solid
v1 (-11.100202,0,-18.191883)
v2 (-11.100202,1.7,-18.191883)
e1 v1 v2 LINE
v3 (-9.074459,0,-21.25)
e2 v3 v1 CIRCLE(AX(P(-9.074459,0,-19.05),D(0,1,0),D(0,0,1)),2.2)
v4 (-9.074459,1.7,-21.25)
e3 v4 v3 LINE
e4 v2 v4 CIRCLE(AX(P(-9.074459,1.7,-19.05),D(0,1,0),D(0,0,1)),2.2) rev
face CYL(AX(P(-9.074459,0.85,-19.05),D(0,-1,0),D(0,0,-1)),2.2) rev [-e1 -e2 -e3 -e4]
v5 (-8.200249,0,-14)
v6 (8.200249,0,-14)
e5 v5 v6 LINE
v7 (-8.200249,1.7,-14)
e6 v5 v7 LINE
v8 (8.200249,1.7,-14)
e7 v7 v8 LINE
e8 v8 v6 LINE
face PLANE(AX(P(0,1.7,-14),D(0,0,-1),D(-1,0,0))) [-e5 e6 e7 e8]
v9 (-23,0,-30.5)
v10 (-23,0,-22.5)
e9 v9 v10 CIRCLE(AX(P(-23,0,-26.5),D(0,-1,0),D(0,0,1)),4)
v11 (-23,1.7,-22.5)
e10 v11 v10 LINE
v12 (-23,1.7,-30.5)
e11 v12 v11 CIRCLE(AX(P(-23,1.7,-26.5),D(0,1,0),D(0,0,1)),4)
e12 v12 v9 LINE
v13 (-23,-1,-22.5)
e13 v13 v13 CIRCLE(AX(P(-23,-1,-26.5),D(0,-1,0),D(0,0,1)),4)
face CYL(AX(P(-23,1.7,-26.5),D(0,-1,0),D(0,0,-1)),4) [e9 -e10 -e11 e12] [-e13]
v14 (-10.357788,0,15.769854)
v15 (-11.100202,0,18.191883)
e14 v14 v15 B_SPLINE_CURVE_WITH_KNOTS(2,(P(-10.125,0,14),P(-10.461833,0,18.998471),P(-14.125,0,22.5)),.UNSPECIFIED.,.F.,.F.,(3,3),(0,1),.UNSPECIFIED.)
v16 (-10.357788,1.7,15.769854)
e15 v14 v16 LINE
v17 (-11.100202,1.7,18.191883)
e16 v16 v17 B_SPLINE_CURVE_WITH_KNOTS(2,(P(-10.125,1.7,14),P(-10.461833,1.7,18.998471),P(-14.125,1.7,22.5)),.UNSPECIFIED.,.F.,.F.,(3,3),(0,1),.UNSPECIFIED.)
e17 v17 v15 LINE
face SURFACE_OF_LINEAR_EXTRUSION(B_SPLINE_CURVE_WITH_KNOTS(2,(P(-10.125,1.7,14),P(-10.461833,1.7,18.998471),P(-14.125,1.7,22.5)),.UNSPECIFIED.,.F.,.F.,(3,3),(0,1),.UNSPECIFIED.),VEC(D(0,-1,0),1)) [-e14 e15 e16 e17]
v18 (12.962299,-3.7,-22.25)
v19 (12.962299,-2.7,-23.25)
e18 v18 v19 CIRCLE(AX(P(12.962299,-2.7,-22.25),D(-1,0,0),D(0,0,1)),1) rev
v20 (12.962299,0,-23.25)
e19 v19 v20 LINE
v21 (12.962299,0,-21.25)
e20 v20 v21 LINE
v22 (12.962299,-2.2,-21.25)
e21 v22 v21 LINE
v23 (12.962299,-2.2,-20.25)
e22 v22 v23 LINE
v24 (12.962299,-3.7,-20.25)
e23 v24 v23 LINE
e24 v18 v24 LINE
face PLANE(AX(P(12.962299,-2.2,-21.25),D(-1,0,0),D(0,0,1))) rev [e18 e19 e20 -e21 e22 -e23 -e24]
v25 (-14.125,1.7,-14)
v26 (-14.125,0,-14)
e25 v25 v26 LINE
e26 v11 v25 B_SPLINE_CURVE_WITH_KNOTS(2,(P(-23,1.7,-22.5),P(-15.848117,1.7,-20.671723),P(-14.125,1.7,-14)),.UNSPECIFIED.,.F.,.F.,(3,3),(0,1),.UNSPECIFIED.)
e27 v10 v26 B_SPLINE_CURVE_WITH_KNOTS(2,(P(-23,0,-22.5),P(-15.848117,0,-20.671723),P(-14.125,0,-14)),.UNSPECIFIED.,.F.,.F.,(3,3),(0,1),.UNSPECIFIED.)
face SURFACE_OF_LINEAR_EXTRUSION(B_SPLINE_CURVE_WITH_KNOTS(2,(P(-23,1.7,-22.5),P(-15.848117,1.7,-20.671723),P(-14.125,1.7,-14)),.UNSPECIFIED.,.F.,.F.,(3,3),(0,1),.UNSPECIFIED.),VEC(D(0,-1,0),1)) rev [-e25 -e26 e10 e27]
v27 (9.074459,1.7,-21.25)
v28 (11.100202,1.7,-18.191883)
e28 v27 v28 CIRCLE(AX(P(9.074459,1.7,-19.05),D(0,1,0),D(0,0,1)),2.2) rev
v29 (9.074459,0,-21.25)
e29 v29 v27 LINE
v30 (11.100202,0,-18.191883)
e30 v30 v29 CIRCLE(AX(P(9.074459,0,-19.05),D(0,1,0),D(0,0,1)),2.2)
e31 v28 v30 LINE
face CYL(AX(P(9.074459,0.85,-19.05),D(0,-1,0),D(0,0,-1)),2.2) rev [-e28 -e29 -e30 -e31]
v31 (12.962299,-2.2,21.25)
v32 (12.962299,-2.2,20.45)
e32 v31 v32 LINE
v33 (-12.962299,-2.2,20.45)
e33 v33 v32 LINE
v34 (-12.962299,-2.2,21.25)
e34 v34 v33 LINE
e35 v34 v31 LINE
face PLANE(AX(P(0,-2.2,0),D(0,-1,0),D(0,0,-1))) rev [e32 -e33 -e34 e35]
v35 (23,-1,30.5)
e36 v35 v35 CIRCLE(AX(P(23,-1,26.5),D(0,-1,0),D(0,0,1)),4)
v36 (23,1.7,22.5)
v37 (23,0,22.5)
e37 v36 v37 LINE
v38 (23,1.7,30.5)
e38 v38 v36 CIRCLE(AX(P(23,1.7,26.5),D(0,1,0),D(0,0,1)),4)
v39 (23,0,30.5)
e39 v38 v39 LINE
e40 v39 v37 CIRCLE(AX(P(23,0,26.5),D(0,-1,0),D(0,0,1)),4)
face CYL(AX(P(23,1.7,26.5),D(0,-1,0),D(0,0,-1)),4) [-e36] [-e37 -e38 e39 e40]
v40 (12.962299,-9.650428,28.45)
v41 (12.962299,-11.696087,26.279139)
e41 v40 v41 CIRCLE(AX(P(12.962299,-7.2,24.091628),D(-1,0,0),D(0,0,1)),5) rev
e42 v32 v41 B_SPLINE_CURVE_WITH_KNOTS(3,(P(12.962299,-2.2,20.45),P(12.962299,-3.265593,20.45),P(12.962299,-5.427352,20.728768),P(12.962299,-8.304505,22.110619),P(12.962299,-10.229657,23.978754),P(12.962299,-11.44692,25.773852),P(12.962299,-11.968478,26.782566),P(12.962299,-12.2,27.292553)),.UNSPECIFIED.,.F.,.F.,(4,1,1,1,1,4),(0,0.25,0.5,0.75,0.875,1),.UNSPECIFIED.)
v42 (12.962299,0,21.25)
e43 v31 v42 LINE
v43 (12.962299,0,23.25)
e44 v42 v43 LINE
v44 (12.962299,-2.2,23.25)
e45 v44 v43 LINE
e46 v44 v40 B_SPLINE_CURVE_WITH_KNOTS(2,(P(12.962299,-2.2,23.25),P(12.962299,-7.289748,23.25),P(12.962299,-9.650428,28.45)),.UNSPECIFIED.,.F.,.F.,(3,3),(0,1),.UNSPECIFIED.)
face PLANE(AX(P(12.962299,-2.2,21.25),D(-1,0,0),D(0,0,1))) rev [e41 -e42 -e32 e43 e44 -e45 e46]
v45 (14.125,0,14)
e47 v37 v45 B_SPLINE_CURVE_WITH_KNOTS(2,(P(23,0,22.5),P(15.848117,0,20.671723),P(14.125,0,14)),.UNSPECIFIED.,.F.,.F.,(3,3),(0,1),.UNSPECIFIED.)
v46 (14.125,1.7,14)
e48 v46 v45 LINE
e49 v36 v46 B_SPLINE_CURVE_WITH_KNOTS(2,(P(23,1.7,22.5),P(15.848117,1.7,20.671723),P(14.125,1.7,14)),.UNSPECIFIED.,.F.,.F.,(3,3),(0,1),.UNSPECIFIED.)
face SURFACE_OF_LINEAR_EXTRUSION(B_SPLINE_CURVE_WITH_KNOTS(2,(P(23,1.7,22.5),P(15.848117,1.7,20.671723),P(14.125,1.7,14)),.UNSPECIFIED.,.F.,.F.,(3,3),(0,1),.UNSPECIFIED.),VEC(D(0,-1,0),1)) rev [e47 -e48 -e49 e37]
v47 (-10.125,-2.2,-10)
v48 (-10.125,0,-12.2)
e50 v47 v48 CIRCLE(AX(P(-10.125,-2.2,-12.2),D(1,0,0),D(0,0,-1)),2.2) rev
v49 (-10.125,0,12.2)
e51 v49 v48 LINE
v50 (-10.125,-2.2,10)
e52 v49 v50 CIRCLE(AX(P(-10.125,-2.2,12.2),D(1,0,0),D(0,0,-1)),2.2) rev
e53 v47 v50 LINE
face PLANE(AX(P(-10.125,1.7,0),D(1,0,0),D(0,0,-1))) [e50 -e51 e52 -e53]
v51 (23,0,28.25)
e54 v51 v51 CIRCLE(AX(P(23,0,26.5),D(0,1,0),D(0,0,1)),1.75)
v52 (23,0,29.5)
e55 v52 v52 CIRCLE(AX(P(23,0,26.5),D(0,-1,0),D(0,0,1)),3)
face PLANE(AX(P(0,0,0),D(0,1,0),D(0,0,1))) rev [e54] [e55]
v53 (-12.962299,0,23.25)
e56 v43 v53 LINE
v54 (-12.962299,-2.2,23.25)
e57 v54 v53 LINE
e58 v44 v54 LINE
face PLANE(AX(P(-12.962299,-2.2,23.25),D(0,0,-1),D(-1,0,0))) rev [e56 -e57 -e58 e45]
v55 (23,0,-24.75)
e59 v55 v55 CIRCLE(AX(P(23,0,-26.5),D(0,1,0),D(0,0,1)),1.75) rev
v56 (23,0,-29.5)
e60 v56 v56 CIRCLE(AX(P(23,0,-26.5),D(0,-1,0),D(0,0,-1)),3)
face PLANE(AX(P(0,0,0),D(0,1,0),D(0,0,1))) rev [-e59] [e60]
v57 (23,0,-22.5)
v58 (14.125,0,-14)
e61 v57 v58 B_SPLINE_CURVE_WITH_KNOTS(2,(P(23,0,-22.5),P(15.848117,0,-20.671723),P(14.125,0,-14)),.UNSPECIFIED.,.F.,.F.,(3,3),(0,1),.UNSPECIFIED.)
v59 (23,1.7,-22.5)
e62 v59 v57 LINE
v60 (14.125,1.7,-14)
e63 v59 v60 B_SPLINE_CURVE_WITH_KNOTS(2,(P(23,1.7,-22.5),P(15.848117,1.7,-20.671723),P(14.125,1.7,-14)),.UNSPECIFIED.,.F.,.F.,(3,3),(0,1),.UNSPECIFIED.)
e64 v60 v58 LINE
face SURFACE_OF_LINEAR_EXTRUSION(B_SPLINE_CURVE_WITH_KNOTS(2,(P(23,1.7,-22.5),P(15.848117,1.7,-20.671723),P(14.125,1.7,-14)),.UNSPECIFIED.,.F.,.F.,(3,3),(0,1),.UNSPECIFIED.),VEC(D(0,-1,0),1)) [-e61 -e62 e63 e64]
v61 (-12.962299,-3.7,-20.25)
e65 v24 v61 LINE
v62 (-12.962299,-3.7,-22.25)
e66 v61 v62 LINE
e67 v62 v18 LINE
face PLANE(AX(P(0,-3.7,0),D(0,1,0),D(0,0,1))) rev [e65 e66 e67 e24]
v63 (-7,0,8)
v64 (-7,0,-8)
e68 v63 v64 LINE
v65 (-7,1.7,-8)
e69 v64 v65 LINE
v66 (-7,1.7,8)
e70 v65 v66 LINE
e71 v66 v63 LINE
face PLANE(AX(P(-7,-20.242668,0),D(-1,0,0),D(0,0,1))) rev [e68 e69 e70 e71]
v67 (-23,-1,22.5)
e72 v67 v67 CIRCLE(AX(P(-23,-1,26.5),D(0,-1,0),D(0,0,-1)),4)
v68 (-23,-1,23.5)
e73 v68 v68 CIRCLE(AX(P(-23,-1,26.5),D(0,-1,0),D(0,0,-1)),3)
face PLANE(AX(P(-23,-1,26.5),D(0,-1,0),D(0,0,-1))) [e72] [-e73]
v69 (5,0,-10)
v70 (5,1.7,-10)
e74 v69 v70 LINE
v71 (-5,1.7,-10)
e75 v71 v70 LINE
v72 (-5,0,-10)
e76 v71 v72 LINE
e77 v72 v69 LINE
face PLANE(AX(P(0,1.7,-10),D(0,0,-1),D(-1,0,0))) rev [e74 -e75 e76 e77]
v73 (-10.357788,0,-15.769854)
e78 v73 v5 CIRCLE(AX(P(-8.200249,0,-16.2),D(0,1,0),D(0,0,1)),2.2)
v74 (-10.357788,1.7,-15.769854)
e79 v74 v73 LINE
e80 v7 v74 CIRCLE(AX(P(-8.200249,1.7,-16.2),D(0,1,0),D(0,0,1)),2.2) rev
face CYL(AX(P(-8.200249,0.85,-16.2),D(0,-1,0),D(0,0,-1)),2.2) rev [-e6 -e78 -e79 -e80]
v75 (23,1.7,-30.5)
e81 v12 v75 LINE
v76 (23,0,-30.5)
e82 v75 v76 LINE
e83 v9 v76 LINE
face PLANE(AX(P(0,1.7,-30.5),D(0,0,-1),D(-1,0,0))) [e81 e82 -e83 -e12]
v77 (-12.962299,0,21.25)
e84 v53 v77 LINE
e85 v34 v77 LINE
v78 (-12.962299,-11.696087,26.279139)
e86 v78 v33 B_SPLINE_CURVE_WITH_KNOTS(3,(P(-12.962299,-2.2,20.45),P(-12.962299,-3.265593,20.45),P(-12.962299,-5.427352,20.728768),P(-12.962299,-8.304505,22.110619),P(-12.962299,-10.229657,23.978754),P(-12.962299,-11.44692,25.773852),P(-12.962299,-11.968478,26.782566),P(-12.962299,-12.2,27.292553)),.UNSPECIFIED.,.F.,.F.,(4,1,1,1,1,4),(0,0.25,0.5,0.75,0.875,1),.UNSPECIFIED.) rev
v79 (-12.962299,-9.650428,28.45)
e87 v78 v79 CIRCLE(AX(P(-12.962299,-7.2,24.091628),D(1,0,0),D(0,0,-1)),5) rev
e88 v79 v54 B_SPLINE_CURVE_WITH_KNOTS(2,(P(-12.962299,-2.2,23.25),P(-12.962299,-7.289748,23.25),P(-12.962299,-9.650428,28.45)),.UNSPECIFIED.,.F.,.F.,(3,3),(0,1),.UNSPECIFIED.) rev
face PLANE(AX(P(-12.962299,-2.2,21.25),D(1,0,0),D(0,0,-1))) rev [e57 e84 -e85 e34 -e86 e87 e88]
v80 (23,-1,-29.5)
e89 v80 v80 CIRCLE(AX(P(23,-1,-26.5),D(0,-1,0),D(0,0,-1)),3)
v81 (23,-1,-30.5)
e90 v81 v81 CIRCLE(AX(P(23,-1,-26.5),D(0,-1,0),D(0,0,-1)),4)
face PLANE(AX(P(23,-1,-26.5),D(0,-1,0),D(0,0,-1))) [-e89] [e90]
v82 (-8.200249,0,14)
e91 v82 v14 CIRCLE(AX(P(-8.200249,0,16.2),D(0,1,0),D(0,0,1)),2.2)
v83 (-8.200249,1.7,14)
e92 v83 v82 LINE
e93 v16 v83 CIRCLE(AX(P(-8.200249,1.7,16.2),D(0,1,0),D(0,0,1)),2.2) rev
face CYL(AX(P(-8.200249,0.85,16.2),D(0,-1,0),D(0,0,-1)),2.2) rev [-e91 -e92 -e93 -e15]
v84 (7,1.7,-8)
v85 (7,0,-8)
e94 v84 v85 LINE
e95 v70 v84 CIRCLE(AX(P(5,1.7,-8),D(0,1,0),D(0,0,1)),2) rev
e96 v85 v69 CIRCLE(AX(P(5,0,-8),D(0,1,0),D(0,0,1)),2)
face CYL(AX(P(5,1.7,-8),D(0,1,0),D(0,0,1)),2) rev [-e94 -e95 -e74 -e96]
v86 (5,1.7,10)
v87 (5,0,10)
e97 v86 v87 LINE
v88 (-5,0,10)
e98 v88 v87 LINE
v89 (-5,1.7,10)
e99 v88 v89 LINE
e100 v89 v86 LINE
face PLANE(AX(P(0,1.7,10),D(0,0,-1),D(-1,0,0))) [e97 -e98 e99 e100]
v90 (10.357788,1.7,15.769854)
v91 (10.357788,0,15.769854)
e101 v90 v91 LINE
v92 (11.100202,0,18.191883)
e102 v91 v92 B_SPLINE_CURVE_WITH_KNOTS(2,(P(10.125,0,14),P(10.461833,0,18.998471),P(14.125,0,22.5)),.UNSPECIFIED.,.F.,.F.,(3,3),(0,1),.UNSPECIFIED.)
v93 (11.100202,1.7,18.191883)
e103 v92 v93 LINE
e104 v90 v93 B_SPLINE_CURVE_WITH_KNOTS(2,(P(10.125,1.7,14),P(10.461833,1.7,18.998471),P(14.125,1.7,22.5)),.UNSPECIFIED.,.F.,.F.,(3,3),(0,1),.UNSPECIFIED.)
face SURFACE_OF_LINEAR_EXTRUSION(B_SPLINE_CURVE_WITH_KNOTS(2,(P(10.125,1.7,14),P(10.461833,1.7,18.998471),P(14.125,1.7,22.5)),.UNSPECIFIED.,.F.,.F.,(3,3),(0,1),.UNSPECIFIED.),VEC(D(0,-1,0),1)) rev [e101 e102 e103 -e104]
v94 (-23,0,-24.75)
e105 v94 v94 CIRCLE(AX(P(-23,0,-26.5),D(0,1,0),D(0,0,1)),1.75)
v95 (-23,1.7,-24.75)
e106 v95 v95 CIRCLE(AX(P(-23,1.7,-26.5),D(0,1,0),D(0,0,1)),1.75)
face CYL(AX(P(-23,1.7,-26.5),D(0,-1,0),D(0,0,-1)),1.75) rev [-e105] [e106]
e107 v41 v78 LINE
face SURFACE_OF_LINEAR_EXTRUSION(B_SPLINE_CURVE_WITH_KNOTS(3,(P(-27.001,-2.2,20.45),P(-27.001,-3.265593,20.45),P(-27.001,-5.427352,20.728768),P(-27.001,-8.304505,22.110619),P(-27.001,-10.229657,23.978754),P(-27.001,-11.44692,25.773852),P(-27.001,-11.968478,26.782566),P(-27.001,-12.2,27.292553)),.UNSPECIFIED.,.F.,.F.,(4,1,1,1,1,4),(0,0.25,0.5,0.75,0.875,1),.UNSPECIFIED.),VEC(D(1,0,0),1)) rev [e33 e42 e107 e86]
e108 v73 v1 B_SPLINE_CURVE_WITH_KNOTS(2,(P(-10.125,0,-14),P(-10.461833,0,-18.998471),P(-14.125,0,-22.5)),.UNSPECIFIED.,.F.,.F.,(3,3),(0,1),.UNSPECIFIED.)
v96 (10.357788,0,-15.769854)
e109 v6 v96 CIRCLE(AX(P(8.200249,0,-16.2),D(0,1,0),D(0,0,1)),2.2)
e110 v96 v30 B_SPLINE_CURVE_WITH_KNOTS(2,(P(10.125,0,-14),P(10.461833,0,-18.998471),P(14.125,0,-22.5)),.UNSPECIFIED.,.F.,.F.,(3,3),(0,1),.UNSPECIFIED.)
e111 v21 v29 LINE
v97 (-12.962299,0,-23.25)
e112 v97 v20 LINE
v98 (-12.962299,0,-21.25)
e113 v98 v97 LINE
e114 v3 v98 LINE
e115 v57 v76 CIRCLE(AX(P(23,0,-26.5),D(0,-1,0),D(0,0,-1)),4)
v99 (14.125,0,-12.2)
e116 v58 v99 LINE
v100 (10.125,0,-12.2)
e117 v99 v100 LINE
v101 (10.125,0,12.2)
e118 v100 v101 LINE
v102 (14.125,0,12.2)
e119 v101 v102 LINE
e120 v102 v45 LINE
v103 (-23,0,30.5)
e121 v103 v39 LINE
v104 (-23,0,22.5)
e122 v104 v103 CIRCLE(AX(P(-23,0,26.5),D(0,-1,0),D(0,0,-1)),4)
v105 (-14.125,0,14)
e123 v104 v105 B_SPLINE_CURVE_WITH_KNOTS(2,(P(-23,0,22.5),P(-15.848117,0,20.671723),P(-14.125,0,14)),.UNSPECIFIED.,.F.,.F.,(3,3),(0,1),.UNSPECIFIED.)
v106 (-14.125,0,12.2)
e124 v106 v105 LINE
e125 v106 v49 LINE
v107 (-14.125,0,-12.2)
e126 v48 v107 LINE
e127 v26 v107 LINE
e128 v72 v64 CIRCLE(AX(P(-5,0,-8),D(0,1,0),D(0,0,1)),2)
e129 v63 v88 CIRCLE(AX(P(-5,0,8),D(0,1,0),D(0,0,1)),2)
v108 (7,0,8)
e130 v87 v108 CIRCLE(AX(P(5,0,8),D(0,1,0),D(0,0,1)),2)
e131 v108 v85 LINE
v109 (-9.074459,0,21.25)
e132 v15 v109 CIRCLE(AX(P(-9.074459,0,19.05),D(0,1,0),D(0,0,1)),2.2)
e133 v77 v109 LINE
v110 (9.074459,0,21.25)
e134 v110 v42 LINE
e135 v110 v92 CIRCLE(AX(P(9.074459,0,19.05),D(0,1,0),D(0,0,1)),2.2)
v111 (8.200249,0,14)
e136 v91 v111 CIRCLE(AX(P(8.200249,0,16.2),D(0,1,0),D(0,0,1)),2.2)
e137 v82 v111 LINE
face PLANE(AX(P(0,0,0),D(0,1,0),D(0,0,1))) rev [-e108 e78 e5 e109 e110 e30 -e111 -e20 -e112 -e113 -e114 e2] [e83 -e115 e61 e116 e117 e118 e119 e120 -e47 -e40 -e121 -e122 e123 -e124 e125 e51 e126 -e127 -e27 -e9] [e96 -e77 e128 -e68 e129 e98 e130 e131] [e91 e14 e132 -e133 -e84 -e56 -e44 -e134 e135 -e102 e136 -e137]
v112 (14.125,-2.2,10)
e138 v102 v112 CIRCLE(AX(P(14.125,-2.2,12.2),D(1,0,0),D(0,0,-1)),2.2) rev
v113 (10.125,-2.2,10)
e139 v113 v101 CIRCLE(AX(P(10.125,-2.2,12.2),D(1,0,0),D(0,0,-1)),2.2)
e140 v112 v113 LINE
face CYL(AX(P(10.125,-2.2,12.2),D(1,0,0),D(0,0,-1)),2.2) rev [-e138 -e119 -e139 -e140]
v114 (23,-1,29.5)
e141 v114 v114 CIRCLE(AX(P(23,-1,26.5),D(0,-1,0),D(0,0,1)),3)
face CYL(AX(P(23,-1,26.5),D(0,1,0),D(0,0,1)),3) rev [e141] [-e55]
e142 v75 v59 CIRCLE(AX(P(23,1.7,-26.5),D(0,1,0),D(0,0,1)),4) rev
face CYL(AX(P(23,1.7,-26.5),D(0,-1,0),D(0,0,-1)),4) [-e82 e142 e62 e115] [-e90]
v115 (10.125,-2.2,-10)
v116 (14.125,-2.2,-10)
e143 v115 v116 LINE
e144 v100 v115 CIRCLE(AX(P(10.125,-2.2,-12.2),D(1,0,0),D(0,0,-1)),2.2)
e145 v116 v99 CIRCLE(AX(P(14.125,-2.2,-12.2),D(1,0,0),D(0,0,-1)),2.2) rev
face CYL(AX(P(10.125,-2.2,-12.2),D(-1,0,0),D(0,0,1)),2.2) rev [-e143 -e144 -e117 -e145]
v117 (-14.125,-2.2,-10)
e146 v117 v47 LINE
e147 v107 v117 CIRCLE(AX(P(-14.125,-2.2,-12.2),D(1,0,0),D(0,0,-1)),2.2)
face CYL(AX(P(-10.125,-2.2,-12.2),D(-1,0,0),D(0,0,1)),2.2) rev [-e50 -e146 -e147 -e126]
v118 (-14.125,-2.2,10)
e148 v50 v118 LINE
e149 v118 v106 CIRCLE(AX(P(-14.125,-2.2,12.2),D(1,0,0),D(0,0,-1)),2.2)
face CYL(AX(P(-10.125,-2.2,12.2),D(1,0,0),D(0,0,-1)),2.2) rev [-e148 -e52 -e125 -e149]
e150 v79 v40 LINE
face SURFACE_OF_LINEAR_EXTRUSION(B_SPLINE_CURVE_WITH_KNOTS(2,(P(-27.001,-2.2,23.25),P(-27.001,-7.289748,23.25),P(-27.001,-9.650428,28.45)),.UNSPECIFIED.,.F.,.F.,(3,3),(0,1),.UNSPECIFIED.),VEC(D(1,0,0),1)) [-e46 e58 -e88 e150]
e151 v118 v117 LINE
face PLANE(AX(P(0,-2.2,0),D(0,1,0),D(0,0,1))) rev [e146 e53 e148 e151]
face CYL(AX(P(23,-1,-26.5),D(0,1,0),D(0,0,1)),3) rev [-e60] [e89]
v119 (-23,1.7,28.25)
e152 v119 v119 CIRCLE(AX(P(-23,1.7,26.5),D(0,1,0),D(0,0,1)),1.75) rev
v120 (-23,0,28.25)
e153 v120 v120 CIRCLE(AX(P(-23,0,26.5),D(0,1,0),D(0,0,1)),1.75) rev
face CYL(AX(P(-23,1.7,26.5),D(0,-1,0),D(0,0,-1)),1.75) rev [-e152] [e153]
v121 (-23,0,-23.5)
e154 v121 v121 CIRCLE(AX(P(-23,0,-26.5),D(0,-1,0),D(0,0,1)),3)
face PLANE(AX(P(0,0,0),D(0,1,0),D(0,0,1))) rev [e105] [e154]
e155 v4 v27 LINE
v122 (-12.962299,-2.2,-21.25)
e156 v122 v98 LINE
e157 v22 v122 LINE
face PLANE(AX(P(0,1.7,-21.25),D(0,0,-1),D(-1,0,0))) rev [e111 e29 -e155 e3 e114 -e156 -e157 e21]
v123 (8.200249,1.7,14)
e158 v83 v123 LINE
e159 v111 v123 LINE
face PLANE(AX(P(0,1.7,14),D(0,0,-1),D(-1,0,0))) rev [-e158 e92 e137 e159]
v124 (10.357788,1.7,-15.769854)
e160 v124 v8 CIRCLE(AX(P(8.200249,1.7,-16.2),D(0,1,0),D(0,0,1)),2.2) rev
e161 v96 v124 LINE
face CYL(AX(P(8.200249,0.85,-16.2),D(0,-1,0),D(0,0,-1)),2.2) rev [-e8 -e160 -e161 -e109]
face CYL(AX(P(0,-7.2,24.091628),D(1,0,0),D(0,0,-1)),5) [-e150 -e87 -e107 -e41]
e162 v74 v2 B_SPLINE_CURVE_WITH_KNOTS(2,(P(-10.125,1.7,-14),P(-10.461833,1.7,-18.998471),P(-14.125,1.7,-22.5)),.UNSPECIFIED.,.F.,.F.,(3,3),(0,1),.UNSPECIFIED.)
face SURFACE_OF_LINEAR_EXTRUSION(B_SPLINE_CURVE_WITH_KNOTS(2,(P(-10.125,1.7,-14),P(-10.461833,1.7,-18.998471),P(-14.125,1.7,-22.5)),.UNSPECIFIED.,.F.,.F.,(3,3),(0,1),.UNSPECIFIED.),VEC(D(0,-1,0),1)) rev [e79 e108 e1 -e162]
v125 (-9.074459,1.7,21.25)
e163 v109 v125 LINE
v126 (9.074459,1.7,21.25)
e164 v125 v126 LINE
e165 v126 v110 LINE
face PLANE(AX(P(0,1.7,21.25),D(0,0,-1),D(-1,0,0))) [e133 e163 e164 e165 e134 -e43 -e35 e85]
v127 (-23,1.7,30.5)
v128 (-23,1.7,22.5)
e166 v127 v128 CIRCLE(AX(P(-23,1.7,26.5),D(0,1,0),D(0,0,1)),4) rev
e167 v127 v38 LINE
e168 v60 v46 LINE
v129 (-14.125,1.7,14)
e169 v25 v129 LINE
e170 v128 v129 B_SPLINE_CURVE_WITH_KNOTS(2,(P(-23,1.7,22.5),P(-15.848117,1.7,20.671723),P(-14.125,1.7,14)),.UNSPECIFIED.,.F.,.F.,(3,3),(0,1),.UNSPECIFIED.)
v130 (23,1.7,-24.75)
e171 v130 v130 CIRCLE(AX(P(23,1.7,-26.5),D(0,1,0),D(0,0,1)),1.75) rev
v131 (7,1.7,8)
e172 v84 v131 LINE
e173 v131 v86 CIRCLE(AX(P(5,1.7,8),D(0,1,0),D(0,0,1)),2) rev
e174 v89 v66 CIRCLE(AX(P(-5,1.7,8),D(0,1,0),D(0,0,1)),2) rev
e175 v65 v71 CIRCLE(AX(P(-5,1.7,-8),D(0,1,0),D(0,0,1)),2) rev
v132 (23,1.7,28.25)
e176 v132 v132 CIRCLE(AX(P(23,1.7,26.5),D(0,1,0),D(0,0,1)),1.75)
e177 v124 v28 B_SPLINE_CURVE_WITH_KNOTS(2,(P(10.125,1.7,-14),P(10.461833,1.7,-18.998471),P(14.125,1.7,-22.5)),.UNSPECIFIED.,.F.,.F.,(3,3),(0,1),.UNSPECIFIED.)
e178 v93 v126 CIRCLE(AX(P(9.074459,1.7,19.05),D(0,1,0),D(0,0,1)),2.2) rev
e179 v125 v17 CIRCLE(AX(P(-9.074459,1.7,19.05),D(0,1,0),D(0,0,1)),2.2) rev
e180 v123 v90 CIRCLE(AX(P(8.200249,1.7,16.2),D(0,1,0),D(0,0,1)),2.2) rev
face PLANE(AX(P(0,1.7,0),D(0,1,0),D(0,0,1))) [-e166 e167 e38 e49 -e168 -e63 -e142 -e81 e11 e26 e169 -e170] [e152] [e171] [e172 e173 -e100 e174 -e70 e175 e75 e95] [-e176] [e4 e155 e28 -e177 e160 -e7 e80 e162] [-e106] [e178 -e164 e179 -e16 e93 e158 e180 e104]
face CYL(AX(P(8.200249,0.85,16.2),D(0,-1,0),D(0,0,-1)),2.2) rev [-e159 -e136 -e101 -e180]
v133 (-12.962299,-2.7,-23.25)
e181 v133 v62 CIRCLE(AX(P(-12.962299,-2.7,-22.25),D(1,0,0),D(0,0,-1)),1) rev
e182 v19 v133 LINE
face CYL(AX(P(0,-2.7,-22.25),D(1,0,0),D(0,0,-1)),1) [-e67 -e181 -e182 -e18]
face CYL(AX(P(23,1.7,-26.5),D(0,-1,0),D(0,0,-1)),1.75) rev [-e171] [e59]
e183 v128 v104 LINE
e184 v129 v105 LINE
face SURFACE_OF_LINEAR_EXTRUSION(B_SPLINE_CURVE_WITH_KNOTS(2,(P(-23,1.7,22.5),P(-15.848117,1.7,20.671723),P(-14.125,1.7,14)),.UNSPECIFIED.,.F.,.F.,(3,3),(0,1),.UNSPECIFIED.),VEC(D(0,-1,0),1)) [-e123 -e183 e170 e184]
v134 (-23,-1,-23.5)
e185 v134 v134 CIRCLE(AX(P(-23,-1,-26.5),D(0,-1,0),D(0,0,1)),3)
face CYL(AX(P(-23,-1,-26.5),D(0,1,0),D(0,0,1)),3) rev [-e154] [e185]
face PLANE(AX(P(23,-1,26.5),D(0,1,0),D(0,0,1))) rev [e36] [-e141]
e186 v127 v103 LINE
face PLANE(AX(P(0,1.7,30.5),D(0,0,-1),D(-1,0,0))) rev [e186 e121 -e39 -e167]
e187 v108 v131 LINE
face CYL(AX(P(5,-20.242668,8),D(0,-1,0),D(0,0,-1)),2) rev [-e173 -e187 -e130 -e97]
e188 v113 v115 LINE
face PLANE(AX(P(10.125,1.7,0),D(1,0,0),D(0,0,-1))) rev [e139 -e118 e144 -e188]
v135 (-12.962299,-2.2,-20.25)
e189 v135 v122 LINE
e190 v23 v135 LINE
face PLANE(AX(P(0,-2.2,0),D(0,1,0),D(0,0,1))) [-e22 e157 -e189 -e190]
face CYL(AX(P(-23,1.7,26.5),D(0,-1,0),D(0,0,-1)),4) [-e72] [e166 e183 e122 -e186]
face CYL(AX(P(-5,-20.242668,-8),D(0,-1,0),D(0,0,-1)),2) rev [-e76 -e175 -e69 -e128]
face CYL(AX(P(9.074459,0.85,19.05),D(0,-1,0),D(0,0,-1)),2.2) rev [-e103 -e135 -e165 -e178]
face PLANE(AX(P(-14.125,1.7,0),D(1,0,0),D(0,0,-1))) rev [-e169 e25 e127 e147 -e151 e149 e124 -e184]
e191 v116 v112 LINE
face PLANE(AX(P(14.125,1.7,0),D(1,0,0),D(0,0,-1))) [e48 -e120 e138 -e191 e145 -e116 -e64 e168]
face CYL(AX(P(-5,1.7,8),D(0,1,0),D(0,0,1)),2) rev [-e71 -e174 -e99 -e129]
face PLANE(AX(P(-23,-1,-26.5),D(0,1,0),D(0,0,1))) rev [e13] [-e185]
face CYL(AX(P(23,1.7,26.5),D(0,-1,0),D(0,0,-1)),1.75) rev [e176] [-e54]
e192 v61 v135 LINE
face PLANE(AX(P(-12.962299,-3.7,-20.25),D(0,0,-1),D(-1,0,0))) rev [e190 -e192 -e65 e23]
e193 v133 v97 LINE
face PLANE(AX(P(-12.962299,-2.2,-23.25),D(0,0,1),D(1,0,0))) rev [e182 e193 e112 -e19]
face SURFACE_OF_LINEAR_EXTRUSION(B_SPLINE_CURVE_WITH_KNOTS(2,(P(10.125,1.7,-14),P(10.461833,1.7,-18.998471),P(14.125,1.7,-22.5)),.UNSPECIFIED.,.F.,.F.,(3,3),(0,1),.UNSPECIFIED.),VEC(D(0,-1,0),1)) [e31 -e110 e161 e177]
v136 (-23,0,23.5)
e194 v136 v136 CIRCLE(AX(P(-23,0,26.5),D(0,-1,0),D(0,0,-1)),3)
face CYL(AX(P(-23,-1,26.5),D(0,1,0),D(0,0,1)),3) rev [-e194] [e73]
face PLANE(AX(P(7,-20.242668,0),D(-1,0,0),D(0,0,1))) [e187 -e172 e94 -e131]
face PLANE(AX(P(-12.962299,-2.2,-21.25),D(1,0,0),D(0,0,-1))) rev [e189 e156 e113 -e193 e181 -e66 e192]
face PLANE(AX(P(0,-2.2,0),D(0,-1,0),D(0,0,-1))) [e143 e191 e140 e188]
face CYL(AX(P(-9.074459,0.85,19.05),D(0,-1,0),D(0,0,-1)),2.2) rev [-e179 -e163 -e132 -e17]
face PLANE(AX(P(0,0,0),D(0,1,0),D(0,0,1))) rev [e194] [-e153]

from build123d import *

# Parameters (mm, degrees)
SKETCH1_R           = 4
SKETCH1_R_2         = 1.75
SKETCH1_W           = 28.25
SKETCH1_H           = 28
SKETCH1_W_2         = 20.25
SKETCH1_H_2         = 20
BOSS_EXTRUDE1_DEPTH = 1.7
SKETCH2_W           = 4
SKETCH2_H           = 20
SKETCH2_W_2         = 25.924598982
SKETCH2_H_2         = 2
BOSS_EXTRUDE2_DEPTH = 2.2
SKETCH4_W           = 25.924598982
SKETCH4_H           = 5.2
SKETCH4_H_2         = 2
SKETCH4_H_3         = 0.8
BOSS_EXTRUDE4_DEPTH = 10
CUT_EXTRUDE1_REACH  = 53.731
FILLET2_DEPTH       = 1.7
FILLET2_START       = -14.125
FILLET2_2_DEPTH     = 4
FILLET2_START_2     = 10.125
FILLET2_3_DEPTH     = 4
BOSS_EXTRUDE5_START = 1
SKETCH7_R           = 4
SKETCH7_R_2         = 3
BOSS_EXTRUDE5_DEPTH = 1
SKETCH8_W           = 25.924598982
SKETCH8_H           = 3
BOSS_EXTRUDE6_DEPTH = 1.5
FILLET8_R           = 1
FILLET9_R           = 5
SKETCH9_W           = 3.125
SKETCH9_H           = 20
BOSS_EXTRUDE7_DEPTH = 1.7
FILLET10_R          = 2


with BuildPart() as part:
    # Sketch1 → Boss-Extrude1 (new body)
    # profile 1 of 13: a face of its own
    with BuildSketch(Plane(origin=(0, 0, 0), x_dir=(1, 0, 0), z_dir=(0, 1, 0))):
        with BuildLine():
            Line((23, 30.5), (-23, 30.5))
            ThreePointArc((-23, 30.5), (-20.171572875, 29.328427125), (-19, 26.5))
            ThreePointArc((-19, 26.5), (-20.171572875, 23.671572875), (-23, 22.5))
            Line((-23, 22.5), (-14.125, 22.5))
            Line((-14.125, 22.5), (14.125, 22.5))
            Line((14.125, 22.5), (23, 22.5))
            ThreePointArc((23, 22.5), (19, 26.5), (23, 30.5))
        make_face()
    # profile 2 of 13: a face of its own
    with BuildSketch(Plane(origin=(0, 0, 0), x_dir=(1, 0, 0), z_dir=(0, 1, 0))):
        with Locations((-23, 26.5)):
            Circle(SKETCH1_R)
        with Locations(Location((-23, 26.5, 0), (0, 0, 270))):
            Circle(SKETCH1_R_2, mode=Mode.SUBTRACT)
    # profile 3 of 13: a face of its own
    with BuildSketch(Plane(origin=(0, 0, 0), x_dir=(1, 0, 0), z_dir=(0, 1, 0))):
        with Locations((23, 26.5)):
            Circle(SKETCH1_R)
        with Locations(Location((23, 26.5, 0), (0, 0, 270))):
            Circle(SKETCH1_R_2, mode=Mode.SUBTRACT)
    # profile 4 of 13: a face of its own
    with BuildSketch(Plane(origin=(0, 0, 0), x_dir=(1, 0, 0), z_dir=(0, 1, 0))):
        with BuildLine():
            add(Edge.make_bspline(
                [(23, 22.5), (15.848117011, 20.671722953), (14.125, 14)],
                knots=[0, 0, 0, 1, 1, 1], degree=2))
            Line((23, 22.5), (14.125, 22.5))
            add(Edge.make_bspline(
                [(12.962299491, 21.25), (13.494356114, 21.89718349), (14.125, 22.5)],
                knots=[0.827841915, 0.827841915, 0.827841915, 1, 1, 1], degree=2))
            add(Edge.make_bspline(
                [(10.125, 14), (10.403844137, 18.137943888), (12.962299491, 21.25)],
                knots=[0, 0, 0, 0.827841915, 0.827841915, 0.827841915], degree=2))
            Line((10.125, 14), (14.125, 14))
        make_face()
    # profile 5 of 13: a face of its own
    with BuildSketch(Plane(origin=(0, 0, 0), x_dir=(1, 0, 0), z_dir=(0, 1, 0))):
        with BuildLine():
            Line((-14.125, 22.5), (-23, 22.5))
            add(Edge.make_bspline(
                [(-23, 22.5), (-15.848117011, 20.671722953), (-14.125, 14)],
                knots=[0, 0, 0, 1, 1, 1], degree=2))
            Line((-14.125, 14), (-10.125, 14))
            add(Edge.make_bspline(
                [(-10.125, 14), (-10.403844137, 18.137943888), (-12.962299491, 21.25)],
                knots=[0, 0, 0, 0.827841915, 0.827841915, 0.827841915], degree=2))
            add(Edge.make_bspline(
                [(-12.962299491, 21.25), (-13.494356114, 21.89718349), (-14.125, 22.5)],
                knots=[0.827841915, 0.827841915, 0.827841915, 1, 1, 1], degree=2))
        make_face()
    # profile 6 of 13: a face of its own
    with BuildSketch(Plane(origin=(0, 0, 0), x_dir=(1, 0, 0), z_dir=(0, 1, 0))):
        Rectangle(SKETCH1_W, SKETCH1_H)
        Rectangle(SKETCH1_W_2, SKETCH1_H_2, mode=Mode.SUBTRACT)
    # profile 7 of 13: a face of its own
    with BuildSketch(Plane(origin=(0, 0, 0), x_dir=(1, 0, 0), z_dir=(0, 1, 0))):
        with BuildLine():
            Line((-10.125, -14), (-14.125, -14))
            add(Edge.make_bspline(
                [(-23, -22.5), (-15.848117011, -20.671722953), (-14.125, -14)],
                knots=[0, 0, 0, 1, 1, 1], degree=2))
            Line((-23, -22.5), (-14.125, -22.5))
            add(Edge.make_bspline(
                [(-12.962299491, -21.25), (-13.494356114, -21.89718349), (-14.125, -22.5)],
                knots=[0.827841915, 0.827841915, 0.827841915, 1, 1, 1], degree=2))
            add(Edge.make_bspline(
                [(-10.125, -14), (-10.403844137, -18.137943888), (-12.962299491, -21.25)],
                knots=[0, 0, 0, 0.827841915, 0.827841915, 0.827841915], degree=2))
        make_face()
    # profile 8 of 13: a face of its own
    with BuildSketch(Plane(origin=(0, 0, 0), x_dir=(1, 0, 0), z_dir=(0, 1, 0))):
        with BuildLine():
            add(Edge.make_bspline(
                [(23, -22.5), (15.848117011, -20.671722953), (14.125, -14)],
                knots=[0, 0, 0, 1, 1, 1], degree=2))
            Line((14.125, -14), (10.125, -14))
            add(Edge.make_bspline(
                [(10.125, -14), (10.403844137, -18.137943888), (12.962299491, -21.25)],
                knots=[0, 0, 0, 0.827841915, 0.827841915, 0.827841915], degree=2))
            add(Edge.make_bspline(
                [(12.962299491, -21.25), (13.494356114, -21.89718349), (14.125, -22.5)],
                knots=[0.827841915, 0.827841915, 0.827841915, 1, 1, 1], degree=2))
            Line((14.125, -22.5), (23, -22.5))
        make_face()
    # profile 9 of 13: a face of its own
    with BuildSketch(Plane(origin=(0, 0, 0), x_dir=(1, 0, 0), z_dir=(0, 1, 0))):
        with BuildLine():
            Line((-14.125, -22.5), (-23, -22.5))
            ThreePointArc((-23, -22.5), (-20.171572875, -23.671572875), (-19, -26.5))
            ThreePointArc((-19, -26.5), (-20.171572875, -29.328427125), (-23, -30.5))
            Line((-23, -30.5), (23, -30.5))
            ThreePointArc((23, -30.5), (19, -26.5), (23, -22.5))
            Line((23, -22.5), (14.125, -22.5))
            Line((14.125, -22.5), (-14.125, -22.5))
        make_face()
    # profile 10 of 13: a face of its own
    with BuildSketch(Plane(origin=(0, 0, 0), x_dir=(1, 0, 0), z_dir=(0, 1, 0))):
        with Locations((23, -26.5)):
            Circle(SKETCH1_R)
        with Locations(Location((23, -26.5, 0), (0, 0, 270))):
            Circle(SKETCH1_R_2, mode=Mode.SUBTRACT)
    # profile 11 of 13: a face of its own
    with BuildSketch(Plane(origin=(0, 0, 0), x_dir=(1, 0, 0), z_dir=(0, 1, 0))):
        with Locations((-23, -26.5)):
            Circle(SKETCH1_R)
        with Locations(Location((-23, -26.5, 0), (0, 0, 270))):
            Circle(SKETCH1_R_2, mode=Mode.SUBTRACT)
    # profile 12 of 13: a face of its own
    with BuildSketch(Plane(origin=(0, 0, 0), x_dir=(1, 0, 0), z_dir=(0, 1, 0))):
        with BuildLine():
            Line((14.125, 22.5), (-14.125, 22.5))
            add(Edge.make_bspline(
                [(-12.962299491, 21.25), (-13.494356114, 21.89718349), (-14.125, 22.5)],
                knots=[0.827841915, 0.827841915, 0.827841915, 1, 1, 1], degree=2))
            Line((-12.962299491, 21.25), (12.962299491, 21.25))
            add(Edge.make_bspline(
                [(12.962299491, 21.25), (13.494356114, 21.89718349), (14.125, 22.5)],
                knots=[0.827841915, 0.827841915, 0.827841915, 1, 1, 1], degree=2))
        make_face()
    # profile 13 of 13: a face of its own
    with BuildSketch(Plane(origin=(0, 0, 0), x_dir=(1, 0, 0), z_dir=(0, 1, 0))):
        with BuildLine():
            Line((12.962299491, -21.25), (-12.962299491, -21.25))
            add(Edge.make_bspline(
                [(-12.962299491, -21.25), (-13.494356114, -21.89718349), (-14.125, -22.5)],
                knots=[0.827841915, 0.827841915, 0.827841915, 1, 1, 1], degree=2))
            Line((-14.125, -22.5), (14.125, -22.5))
            add(Edge.make_bspline(
                [(12.962299491, -21.25), (13.494356114, -21.89718349), (14.125, -22.5)],
                knots=[0.827841915, 0.827841915, 0.827841915, 1, 1, 1], degree=2))
        make_face()
    extrude(amount=BOSS_EXTRUDE1_DEPTH)

    # Sketch2 → Boss-Extrude2 (add)
    with BuildSketch(Plane.XZ):
        with Locations((-12.125, 0)):
            Rectangle(SKETCH2_W, SKETCH2_H)
        with Locations((12.125, 0)):
            Rectangle(SKETCH2_W, SKETCH2_H)
        with Locations((0, 22.25)):
            Rectangle(SKETCH2_W_2, SKETCH2_H_2)
        with Locations((0, -22.25)):
            Rectangle(SKETCH2_W_2, SKETCH2_H_2)
    extrude(amount=BOSS_EXTRUDE2_DEPTH)

    # Sketch4 → Boss-Extrude4 (add)
    with BuildSketch(Plane.XZ.offset(2.2)):
        with Locations((0, 25.85)):
            Rectangle(SKETCH4_W, SKETCH4_H)
        with Locations((0, 22.25)):
            Rectangle(SKETCH4_W, SKETCH4_H_2)
        with Locations((0, 20.85)):
            Rectangle(SKETCH4_W, SKETCH4_H_3)
    extrude(amount=BOSS_EXTRUDE4_DEPTH)

    # Sketch5 → Cut-Extrude1 (cut, up to next)
    with BuildSketch(Plane(origin=(12.962299491, 0, 0), x_dir=(0, 0, -1), z_dir=(1, 0, 0)), mode=Mode.PRIVATE) as cut_extrude1_sk1:
        with BuildLine():
            Line((-23.25, -2.2), (-28.45, -2.2))
            Line((-28.45, -2.2), (-28.45, -9.650428017))
            add(Edge.make_bspline(
                [(-23.25, -2.2), (-23.25, -7.289748453), (-28.45, -9.650428017)],
                knots=[0, 0, 0, 1, 1, 1], degree=2))
        make_face()
    cut_extrude1_tool1 = extrude(cut_extrude1_sk1.sketch, amount=-CUT_EXTRUDE1_REACH, mode=Mode.PRIVATE) & part.part
    # Sketch5 → Cut-Extrude1 (cut, up to next)
    with BuildSketch(Plane(origin=(12.962299491, 0, 0), x_dir=(0, 0, -1), z_dir=(1, 0, 0)), mode=Mode.PRIVATE) as cut_extrude1_sk2:
        with BuildLine():
            Line((-20.45, -12.2), (-20.45, -2.2))
            add(Edge.make_bspline(
                [(-20.45, -2.2), (-20.45, -3.265592553), (-20.728768325, -5.427352401), (-22.110619183, -8.304504684), (-23.978754143, -10.229657313), (-25.773852061, -11.446919799), (-26.782566467, -11.968477758), (-27.29255337, -12.2)],
                knots=[0, 0, 0, 0, 0.25, 0.5, 0.75, 0.875, 1, 1, 1, 1], degree=3))
            Line((-27.29255337, -12.2), (-20.45, -12.2))
        make_face()
    cut_extrude1_tool2 = extrude(cut_extrude1_sk2.sketch, amount=-CUT_EXTRUDE1_REACH, mode=Mode.PRIVATE) & part.part
    add(cut_extrude1_tool1.solids().sort_by_distance((12.962299, -5.157437, 26.282752))[0], mode=Mode.SUBTRACT)
    add(cut_extrude1_tool2.solids().sort_by_distance((12.962299, -9.932499, 22.342862))[0], mode=Mode.SUBTRACT)

    # Fillet2: read off the stored shape, not the designer's step
    # Fillet2 outline → Fillet2 (add)
    with BuildSketch(Plane(origin=(0, 0, 0), x_dir=(1, 0, 0), z_dir=(0, 1, 0))):
        with BuildLine():
            add(Edge.make_bspline(
                [(-11.100202276, 18.191883314), (-11.79328482, 19.828032934), (-12.962299491, 21.25)],
                knots=[0.449582688, 0.449582688, 0.449582688, 0.827841915, 0.827841915, 0.827841915], degree=2))
            ThreePointArc((-11.100202276, 18.191883314), (-10.908560529, 20.26493689), (-9.074459017, 21.25))
            Line((-9.074459017, 21.25), (-12.962299491, 21.25))
        make_face()
        with BuildLine():
            ThreePointArc((-8.200248655, 14), (-9.595540354, 14.499070526), (-10.357787541, 15.769853569))
            add(Edge.make_bspline(
                [(-10.125, 14), (-10.186303346, 14.909718991), (-10.357787541, 15.769853569)],
                knots=[0, 0, 0, 0.18199945, 0.18199945, 0.18199945], degree=2))
            Line((-10.125, 14), (-8.200248655, 14))
        make_face()
        with BuildLine():
            Line((12.962299491, 21.25), (9.074459017, 21.25))
            ThreePointArc((9.074459017, 21.25), (10.908560529, 20.26493689), (11.100202276, 18.191883314))
            add(Edge.make_bspline(
                [(11.100202276, 18.191883314), (11.79328482, 19.828032934), (12.962299491, 21.25)],
                knots=[0.449582688, 0.449582688, 0.449582688, 0.827841915, 0.827841915, 0.827841915], degree=2))
        make_face()
        with BuildLine():
            ThreePointArc((10.357787541, 15.769853569), (9.595540354, 14.499070526), (8.200248655, 14))
            Line((8.200248655, 14), (10.125, 14))
            add(Edge.make_bspline(
                [(10.125, 14), (10.186303346, 14.909718991), (10.357787541, 15.769853569)],
                knots=[0, 0, 0, 0.18199945, 0.18199945, 0.18199945], degree=2))
        make_face()
        with BuildLine():
            Line((-12.962299491, -21.25), (-9.074459017, -21.25))
            ThreePointArc((-9.074459017, -21.25), (-10.908560529, -20.26493689), (-11.100202276, -18.191883314))
            add(Edge.make_bspline(
                [(-11.100202276, -18.191883314), (-11.79328482, -19.828032934), (-12.962299491, -21.25)],
                knots=[0.449582688, 0.449582688, 0.449582688, 0.827841915, 0.827841915, 0.827841915], degree=2))
        make_face()
        with BuildLine():
            ThreePointArc((11.100202276, -18.191883314), (10.908560529, -20.26493689), (9.074459017, -21.25))
            Line((9.074459017, -21.25), (12.962299491, -21.25))
            add(Edge.make_bspline(
                [(11.100202276, -18.191883314), (11.79328482, -19.828032934), (12.962299491, -21.25)],
                knots=[0.449582688, 0.449582688, 0.449582688, 0.827841915, 0.827841915, 0.827841915], degree=2))
        make_face()
        with BuildLine():
            add(Edge.make_bspline(
                [(-10.125, -14), (-10.186303346, -14.909718991), (-10.357787541, -15.769853569)],
                knots=[0, 0, 0, 0.18199945, 0.18199945, 0.18199945], degree=2))
            ThreePointArc((-10.357787541, -15.769853569), (-9.595540354, -14.499070526), (-8.200248655, -14))
            Line((-8.200248655, -14), (-10.125, -14))
        make_face()
        with BuildLine():
            ThreePointArc((8.200248655, -14), (9.595540354, -14.499070526), (10.357787541, -15.769853569))
            add(Edge.make_bspline(
                [(10.125, -14), (10.186303346, -14.909718991), (10.357787541, -15.769853569)],
                knots=[0, 0, 0, 0.18199945, 0.18199945, 0.18199945], degree=2))
            Line((10.125, -14), (8.200248655, -14))
        make_face()
    extrude(amount=FILLET2_DEPTH)

    # Fillet2 2 outline → Fillet2 2 (add)
    with BuildSketch(Plane.YZ.offset(FILLET2_START)):
        with BuildLine():
            ThreePointArc((0, 12.2), (-0.644365081, 10.644365081), (-2.2, 10))
            Line((-2.2, 10), (0, 10))
            Line((0, 10), (0, 12.2))
        make_face()
        with BuildLine():
            Line((0, -10), (-2.2, -10))
            ThreePointArc((-2.2, -10), (-0.644365081, -10.644365081), (0, -12.2))
            Line((0, -12.2), (0, -10))
        make_face()
    extrude(amount=FILLET2_2_DEPTH)

    # Fillet2 3 outline → Fillet2 3 (add)
    with BuildSketch(Plane.YZ.offset(FILLET2_START_2)):
        with BuildLine():
            ThreePointArc((0, 12.2), (-0.644365081, 10.644365081), (-2.2, 10))
            Line((-2.2, 10), (0, 10))
            Line((0, 10), (0, 12.2))
        make_face()
        with BuildLine():
            Line((0, -10), (-2.2, -10))
            ThreePointArc((-2.2, -10), (-0.644365081, -10.644365081), (0, -12.2))
            Line((0, -12.2), (0, -10))
        make_face()
    extrude(amount=FILLET2_3_DEPTH)

    # Sketch7 → Boss-Extrude5 (add)
    # profile 1 of 4: a face of its own
    with BuildSketch(Plane.XZ.offset(BOSS_EXTRUDE5_START)):
        with Locations(Location((-23, 26.5, 0), (0, 0, 270))):
            Circle(SKETCH7_R)
        with Locations(Location((-23, 26.5, 0), (0, 0, 270))):
            Circle(SKETCH7_R_2, mode=Mode.SUBTRACT)
    # profile 2 of 4: a face of its own
    with BuildSketch(Plane.XZ.offset(BOSS_EXTRUDE5_START)):
        with Locations(Location((23, 26.5, 0), (0, 0, 90))):
            Circle(SKETCH7_R)
        with Locations(Location((23, 26.5, 0), (0, 0, 90))):
            Circle(SKETCH7_R_2, mode=Mode.SUBTRACT)
    # profile 3 of 4: a face of its own
    with BuildSketch(Plane.XZ.offset(BOSS_EXTRUDE5_START)):
        with Locations(Location((23, -26.5, 0), (0, 0, 270))):
            Circle(SKETCH7_R)
        with Locations(Location((23, -26.5, 0), (0, 0, 270))):
            Circle(SKETCH7_R_2, mode=Mode.SUBTRACT)
    # profile 4 of 4: a face of its own
    with BuildSketch(Plane.XZ.offset(BOSS_EXTRUDE5_START)):
        with Locations(Location((-23, -26.5, 0), (0, 0, 90))):
            Circle(SKETCH7_R)
        with Locations(Location((-23, -26.5, 0), (0, 0, 90))):
            Circle(SKETCH7_R_2, mode=Mode.SUBTRACT)
    extrude(amount=-BOSS_EXTRUDE5_DEPTH)

    # Sketch8 → Boss-Extrude6 (add)
    with BuildSketch(Plane.XZ.offset(2.2)):
        with Locations((0, -21.75)):
            Rectangle(SKETCH8_W, SKETCH8_H)
    extrude(amount=BOSS_EXTRUDE6_DEPTH)

    # Fillet8
    fillet8_edges = [part.edges().sort_by_distance(p)[0] for p in [
        (0, -3.7, -23.25),
    ]]
    fillet(fillet8_edges, radius=FILLET8_R)

    # Fillet9
    # the kernel refuses this fillet: 5 mm, written as the material it takes off along each edge
    with BuildSketch(Plane(origin=(23.858228357, -12.2, 28.45), x_dir=(0, 0, -1), z_dir=(-1, 0, 0))) as fillet9_piece_1:
        with BuildLine():
            CenterArc((4.358371546, -5), FILLET9_R, 90, 60.653791812)
            Line((0, -2.549571983), (0, 0))
            Line((0, 0), (4.358371546, 0))
        make_face()
    extrude(amount=47.716456714, mode=Mode.SUBTRACT)

    # Sketch9 → Boss-Extrude7 (add)
    with BuildSketch(Plane(origin=(0, 1.7, 0), x_dir=(1, 0, 0), z_dir=(0, 1, 0))):
        with Locations((-8.5625, 0)):
            Rectangle(SKETCH9_W, SKETCH9_H)
        with Locations((8.5625, 0)):
            Rectangle(SKETCH9_W, SKETCH9_H)
    extrude(amount=-BOSS_EXTRUDE7_DEPTH)

    # Fillet10
    fillet10_edges = [part.edges().sort_by_distance(p)[0] for p in [
        (-7, 0.85, 10),
        (-7, 0.85, -10),
        (7, 0.85, -10),
        (7, 0.85, 10),
    ]]
    fillet(fillet10_edges, radius=FILLET10_R)


solid = part.part
